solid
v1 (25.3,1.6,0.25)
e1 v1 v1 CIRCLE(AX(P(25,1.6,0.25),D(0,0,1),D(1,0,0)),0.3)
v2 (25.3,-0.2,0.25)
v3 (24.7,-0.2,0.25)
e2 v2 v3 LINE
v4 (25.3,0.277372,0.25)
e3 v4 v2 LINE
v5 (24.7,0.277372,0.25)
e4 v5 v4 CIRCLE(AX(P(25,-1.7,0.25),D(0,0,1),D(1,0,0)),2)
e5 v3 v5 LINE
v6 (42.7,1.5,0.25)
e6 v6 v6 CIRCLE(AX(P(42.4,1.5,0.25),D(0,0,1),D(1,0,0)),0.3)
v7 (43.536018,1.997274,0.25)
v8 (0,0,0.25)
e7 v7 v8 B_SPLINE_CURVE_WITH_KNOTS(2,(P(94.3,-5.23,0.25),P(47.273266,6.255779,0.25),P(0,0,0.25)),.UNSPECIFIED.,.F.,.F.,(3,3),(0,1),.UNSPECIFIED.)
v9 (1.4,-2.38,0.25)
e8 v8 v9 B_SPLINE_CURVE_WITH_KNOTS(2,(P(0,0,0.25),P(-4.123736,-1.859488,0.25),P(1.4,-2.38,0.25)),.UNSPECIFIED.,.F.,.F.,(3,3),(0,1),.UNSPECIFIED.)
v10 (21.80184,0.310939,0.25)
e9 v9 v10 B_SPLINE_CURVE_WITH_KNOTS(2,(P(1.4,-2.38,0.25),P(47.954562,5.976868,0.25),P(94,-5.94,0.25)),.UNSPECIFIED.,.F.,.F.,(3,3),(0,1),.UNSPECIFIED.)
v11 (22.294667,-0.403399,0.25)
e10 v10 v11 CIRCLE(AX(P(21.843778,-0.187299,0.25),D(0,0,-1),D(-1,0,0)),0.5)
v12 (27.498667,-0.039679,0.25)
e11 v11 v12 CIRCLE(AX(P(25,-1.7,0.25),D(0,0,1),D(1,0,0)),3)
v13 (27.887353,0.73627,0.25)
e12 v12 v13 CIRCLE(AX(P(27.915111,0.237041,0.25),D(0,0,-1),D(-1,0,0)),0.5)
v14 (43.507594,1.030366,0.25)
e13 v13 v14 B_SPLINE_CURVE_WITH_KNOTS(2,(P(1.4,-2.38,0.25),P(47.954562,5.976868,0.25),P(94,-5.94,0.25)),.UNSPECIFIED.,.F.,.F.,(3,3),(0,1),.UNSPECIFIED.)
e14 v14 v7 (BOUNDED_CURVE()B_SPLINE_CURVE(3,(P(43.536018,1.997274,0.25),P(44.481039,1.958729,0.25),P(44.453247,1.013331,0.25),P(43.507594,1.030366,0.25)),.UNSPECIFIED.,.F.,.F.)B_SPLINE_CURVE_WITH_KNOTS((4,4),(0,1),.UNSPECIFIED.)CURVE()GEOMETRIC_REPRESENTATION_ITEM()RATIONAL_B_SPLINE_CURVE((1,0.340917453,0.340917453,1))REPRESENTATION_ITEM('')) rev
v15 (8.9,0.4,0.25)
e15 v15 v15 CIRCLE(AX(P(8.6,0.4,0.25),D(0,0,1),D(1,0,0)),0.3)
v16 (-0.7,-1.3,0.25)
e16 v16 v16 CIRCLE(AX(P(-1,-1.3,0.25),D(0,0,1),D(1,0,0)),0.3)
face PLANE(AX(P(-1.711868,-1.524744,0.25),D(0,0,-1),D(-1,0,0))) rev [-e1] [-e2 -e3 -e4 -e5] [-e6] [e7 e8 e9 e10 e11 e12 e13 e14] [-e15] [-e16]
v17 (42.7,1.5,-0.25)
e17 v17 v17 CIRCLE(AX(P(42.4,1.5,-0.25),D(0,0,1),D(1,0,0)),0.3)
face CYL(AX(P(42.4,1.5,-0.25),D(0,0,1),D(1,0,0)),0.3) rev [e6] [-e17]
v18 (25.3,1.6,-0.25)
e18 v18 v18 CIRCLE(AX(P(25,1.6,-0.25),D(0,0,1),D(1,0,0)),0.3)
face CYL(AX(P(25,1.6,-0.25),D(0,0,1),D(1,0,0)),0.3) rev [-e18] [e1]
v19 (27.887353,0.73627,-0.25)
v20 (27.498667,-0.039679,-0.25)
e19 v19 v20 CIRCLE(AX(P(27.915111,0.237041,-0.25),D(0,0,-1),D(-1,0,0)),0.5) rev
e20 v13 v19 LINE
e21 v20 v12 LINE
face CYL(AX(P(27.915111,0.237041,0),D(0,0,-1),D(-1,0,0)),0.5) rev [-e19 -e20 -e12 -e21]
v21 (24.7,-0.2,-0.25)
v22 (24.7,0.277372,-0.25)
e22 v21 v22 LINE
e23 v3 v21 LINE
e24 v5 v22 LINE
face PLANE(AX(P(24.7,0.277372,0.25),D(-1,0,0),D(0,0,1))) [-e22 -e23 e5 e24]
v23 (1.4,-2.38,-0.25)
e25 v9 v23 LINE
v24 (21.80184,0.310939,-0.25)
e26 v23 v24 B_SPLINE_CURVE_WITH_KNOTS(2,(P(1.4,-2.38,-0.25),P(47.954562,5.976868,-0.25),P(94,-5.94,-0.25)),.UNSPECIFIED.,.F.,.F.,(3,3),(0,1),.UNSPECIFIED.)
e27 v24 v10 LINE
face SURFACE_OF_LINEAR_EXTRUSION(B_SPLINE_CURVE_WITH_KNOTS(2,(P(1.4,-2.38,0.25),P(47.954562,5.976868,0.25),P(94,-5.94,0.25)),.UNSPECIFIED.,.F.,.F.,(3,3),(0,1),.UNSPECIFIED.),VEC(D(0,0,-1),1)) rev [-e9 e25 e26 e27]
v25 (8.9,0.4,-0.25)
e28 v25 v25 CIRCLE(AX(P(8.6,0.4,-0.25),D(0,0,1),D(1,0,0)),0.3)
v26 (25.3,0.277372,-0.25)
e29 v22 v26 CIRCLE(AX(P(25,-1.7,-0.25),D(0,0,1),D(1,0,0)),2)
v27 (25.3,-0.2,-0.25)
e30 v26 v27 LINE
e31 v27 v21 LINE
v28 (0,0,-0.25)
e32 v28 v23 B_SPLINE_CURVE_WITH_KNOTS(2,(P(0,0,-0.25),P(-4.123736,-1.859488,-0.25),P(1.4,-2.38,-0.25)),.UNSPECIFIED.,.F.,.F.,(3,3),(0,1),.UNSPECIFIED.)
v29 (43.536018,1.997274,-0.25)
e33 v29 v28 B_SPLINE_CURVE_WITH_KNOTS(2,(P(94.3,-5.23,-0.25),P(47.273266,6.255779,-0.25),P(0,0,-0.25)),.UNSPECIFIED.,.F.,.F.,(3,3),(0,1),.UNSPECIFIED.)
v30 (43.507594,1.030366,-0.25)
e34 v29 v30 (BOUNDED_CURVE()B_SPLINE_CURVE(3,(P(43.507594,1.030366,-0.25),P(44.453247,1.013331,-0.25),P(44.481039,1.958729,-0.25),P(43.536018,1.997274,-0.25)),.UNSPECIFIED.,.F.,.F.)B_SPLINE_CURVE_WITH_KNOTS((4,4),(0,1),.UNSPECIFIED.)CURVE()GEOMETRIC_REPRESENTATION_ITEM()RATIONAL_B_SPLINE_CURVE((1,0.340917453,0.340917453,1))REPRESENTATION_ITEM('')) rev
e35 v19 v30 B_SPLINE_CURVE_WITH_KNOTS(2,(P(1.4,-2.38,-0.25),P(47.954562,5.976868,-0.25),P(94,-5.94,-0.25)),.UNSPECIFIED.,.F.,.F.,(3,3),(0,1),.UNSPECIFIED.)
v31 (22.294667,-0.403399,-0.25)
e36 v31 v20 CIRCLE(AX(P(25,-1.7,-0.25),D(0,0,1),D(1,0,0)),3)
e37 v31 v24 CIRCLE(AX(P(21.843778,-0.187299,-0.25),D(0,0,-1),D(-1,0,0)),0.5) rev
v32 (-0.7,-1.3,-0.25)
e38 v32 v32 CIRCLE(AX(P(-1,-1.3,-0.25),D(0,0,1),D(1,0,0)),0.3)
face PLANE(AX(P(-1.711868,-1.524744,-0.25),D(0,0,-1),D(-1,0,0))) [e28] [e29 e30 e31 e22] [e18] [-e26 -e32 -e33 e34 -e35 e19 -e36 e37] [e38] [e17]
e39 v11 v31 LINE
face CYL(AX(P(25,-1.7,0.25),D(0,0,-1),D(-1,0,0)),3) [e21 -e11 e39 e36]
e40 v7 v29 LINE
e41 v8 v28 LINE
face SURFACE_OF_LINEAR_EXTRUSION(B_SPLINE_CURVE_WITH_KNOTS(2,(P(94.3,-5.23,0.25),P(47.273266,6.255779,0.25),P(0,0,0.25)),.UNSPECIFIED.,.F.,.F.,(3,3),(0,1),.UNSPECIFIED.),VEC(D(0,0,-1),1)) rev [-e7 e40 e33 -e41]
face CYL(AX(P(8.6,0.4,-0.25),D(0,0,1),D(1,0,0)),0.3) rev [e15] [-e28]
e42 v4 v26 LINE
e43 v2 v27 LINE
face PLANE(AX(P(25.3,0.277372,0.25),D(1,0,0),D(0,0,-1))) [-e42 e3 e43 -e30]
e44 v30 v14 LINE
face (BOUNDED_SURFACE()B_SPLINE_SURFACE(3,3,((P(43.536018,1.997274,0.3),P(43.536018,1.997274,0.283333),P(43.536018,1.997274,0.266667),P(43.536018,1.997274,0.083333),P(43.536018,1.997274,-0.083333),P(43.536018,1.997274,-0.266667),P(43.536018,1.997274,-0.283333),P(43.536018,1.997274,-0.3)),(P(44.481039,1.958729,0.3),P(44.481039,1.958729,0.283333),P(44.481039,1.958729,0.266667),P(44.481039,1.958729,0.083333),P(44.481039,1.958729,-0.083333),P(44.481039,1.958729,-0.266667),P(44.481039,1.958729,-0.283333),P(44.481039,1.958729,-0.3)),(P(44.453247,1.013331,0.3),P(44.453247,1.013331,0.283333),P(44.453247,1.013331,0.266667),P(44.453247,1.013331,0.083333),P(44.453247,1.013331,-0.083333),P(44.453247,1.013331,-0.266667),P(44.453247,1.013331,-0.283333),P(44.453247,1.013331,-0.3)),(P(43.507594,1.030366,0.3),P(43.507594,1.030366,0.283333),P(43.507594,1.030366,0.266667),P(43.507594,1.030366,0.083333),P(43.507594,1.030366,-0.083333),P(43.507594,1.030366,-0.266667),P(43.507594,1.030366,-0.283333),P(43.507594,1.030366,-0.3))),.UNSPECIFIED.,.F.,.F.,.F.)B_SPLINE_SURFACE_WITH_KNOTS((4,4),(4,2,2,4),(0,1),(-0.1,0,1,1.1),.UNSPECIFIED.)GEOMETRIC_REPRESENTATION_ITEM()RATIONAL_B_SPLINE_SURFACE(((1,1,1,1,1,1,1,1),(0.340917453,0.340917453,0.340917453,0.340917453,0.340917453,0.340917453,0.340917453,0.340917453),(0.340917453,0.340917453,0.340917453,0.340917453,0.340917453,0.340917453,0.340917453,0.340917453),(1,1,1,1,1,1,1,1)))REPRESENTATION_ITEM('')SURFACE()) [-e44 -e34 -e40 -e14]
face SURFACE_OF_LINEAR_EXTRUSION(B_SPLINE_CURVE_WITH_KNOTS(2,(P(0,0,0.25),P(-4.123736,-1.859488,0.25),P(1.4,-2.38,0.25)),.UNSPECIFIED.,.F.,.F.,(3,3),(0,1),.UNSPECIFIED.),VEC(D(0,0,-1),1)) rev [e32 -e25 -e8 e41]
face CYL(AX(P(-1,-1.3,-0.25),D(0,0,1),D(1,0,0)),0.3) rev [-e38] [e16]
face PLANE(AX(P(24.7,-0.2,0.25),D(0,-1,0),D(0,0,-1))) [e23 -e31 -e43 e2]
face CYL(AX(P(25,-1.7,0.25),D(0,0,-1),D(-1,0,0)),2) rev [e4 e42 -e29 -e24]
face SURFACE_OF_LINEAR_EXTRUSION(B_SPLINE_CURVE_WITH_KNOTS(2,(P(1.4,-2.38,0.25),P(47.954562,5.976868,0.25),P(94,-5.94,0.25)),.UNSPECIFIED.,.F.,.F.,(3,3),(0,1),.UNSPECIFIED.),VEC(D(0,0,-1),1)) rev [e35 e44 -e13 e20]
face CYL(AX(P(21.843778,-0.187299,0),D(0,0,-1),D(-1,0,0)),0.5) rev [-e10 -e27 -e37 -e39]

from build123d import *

# Parameters (mm, degrees)
EXTRUDE_1_DEPTH     = 0.25
SKETCH_3_R          = 0.3
SKETCH_3_R_2        = 0.2
CUT_EXTRUDE_1_DEPTH = 0.25
EXTRUDE_2_DEPTH     = 0.25
FILLET_1_R          = 0.5
SKETCH_5_W          = 70.035704888
SKETCH_5_H          = 36.253776648
CUT_EXTRUDE_2_DEPTH = 0.25
FILLET_START        = -1
FILLET_2_DEPTH      = 2


with BuildPart() as part:
    # 草图2 → 凸台-拉伸1 (new, symmetric)
    with BuildSketch(Plane.XY):
        with BuildLine():
            ThreePointArc((94.3, -5.23), (94.279085645, -5.63954323), (94, -5.94))
            add(Edge.make_bspline(
                [(1.4, -2.38), (47.954561827, 5.976867864), (94, -5.94)],
                knots=[0, 0, 0, 1, 1, 1], degree=2))
            add(Edge.make_bspline(
                [(0, 0), (-4.123736473, -1.859487618), (1.4, -2.38)],
                knots=[0, 0, 0, 1, 1, 1], degree=2))
            add(Edge.make_bspline(
                [(0, 0), (47.273266317, 6.255778848), (94.3, -5.23)],
                knots=[0, 0, 0, 1, 1, 1], degree=2))
        make_face()
    extrude(amount=EXTRUDE_1_DEPTH, both=True)

    # 草图3 → 切除-拉伸1 (cut, symmetric)
    with BuildSketch(Plane.XY):
        with Locations((-1, -1.3)):
            Circle(SKETCH_3_R)
        with Locations((8.6, 0.4)):
            Circle(SKETCH_3_R)
        with Locations((25, 1.6)):
            Circle(SKETCH_3_R)
        with Locations((42.4, 1.5)):
            Circle(SKETCH_3_R)
        with Locations((68, -0.5)):
            Circle(SKETCH_3_R_2)
        with Locations((93.8, -5.5)):
            Circle(SKETCH_3_R_2)
    extrude(amount=CUT_EXTRUDE_1_DEPTH, both=True, mode=Mode.SUBTRACT)

    # 草图4 → 凸台-拉伸2 (add, symmetric)
    with BuildSketch(Plane.XY):
        with BuildLine():
            ThreePointArc((22.854587938, 0.396951856), (25.20918356, -4.692698154), (26.83283005, 0.675022949))
            add(Edge.make_bspline(
                [(22.854587938, 0.396951856), (24.844176287, 0.554595418), (26.83283005, 0.675022949)],
                knots=[0, 0, 0, 1, 1, 1], degree=2))
        make_face()
        with BuildLine():
            Line((24.7, 0.277371993), (24.7, -0.2))
            Line((24.7, -0.2), (25.3, -0.2))
            Line((25.3, -0.2), (25.3, 0.277371993))
            ThreePointArc((25.3, 0.277371993), (25, -3.7), (24.7, 0.277371993))
        make_face(mode=Mode.SUBTRACT)
    extrude(amount=EXTRUDE_2_DEPTH, both=True)

    # 圆角1
    fillet_1_edges = [part.edges().sort_by_distance(p)[0] for p in [
        (26.83283005, 0.675022949, -0.125),
        (22.854587938, 0.396951856, -0.125),
    ]]
    fillet(fillet_1_edges, radius=FILLET_1_R)

    # 草图5 → 切除-拉伸2 (cut, symmetric)
    with BuildSketch(Plane.XY):
        with Locations((79.017852444, -9.233575246)):
            Rectangle(SKETCH_5_W, SKETCH_5_H)
    extrude(amount=CUT_EXTRUDE_2_DEPTH, both=True, mode=Mode.SUBTRACT)

    # 圆角2: read off the stored shape, not the designer's step
    # 圆角2 outline → 圆角2 (cut)
    with BuildSketch(Plane.XY.offset(FILLET_START)):
        with BuildLine():
            add(Edge.make_bspline(
                [(44, 1.977919753), (43.768012094, 1.987811641), (43.536018221, 1.997274187)],
                knots=[0.534054584, 0.534054584, 0.534054584, 0.538973918, 0.538973918, 0.538973918], degree=2))
            add(Edge.make_bspline(
                [(43.536018221, 1.997274187), (43.770994303, 1.987690003), (44.000000033, 1.825022881), (44, 1.513981716)],
                knots=[0, 0, 0, 0, 0.492568205, 0.492568205, 0.492568205, 0.492568205], degree=3, weights=[1, 0.675356893, 0.510622658, 0.505797296]))
            Line((44, 1.513981716), (44, 1.977919753))
        make_face()
        with BuildLine():
            Line((44, 1.020922578), (44, 1.513981716))
            add(Edge.make_bspline(
                [(44, 1.513981716), (43.999999965, 1.187287005), (43.753387643, 1.02593813), (43.507593676, 1.030365965)],
                knots=[0.492568205, 0.492568205, 0.492568205, 0.492568205, 1, 1, 1, 1], degree=3, weights=[0.505797296, 0.500826325, 0.66556056, 1]))
            add(Edge.make_bspline(
                [(43.507593676, 1.030365965), (43.753804029, 1.025930629), (44, 1.020922578)],
                knots=[0.453363068, 0.453363068, 0.453363068, 0.458678061, 0.458678061, 0.458678061], degree=2))
        make_face()
    extrude(amount=FILLET_2_DEPTH, mode=Mode.SUBTRACT)


solid = part.part
